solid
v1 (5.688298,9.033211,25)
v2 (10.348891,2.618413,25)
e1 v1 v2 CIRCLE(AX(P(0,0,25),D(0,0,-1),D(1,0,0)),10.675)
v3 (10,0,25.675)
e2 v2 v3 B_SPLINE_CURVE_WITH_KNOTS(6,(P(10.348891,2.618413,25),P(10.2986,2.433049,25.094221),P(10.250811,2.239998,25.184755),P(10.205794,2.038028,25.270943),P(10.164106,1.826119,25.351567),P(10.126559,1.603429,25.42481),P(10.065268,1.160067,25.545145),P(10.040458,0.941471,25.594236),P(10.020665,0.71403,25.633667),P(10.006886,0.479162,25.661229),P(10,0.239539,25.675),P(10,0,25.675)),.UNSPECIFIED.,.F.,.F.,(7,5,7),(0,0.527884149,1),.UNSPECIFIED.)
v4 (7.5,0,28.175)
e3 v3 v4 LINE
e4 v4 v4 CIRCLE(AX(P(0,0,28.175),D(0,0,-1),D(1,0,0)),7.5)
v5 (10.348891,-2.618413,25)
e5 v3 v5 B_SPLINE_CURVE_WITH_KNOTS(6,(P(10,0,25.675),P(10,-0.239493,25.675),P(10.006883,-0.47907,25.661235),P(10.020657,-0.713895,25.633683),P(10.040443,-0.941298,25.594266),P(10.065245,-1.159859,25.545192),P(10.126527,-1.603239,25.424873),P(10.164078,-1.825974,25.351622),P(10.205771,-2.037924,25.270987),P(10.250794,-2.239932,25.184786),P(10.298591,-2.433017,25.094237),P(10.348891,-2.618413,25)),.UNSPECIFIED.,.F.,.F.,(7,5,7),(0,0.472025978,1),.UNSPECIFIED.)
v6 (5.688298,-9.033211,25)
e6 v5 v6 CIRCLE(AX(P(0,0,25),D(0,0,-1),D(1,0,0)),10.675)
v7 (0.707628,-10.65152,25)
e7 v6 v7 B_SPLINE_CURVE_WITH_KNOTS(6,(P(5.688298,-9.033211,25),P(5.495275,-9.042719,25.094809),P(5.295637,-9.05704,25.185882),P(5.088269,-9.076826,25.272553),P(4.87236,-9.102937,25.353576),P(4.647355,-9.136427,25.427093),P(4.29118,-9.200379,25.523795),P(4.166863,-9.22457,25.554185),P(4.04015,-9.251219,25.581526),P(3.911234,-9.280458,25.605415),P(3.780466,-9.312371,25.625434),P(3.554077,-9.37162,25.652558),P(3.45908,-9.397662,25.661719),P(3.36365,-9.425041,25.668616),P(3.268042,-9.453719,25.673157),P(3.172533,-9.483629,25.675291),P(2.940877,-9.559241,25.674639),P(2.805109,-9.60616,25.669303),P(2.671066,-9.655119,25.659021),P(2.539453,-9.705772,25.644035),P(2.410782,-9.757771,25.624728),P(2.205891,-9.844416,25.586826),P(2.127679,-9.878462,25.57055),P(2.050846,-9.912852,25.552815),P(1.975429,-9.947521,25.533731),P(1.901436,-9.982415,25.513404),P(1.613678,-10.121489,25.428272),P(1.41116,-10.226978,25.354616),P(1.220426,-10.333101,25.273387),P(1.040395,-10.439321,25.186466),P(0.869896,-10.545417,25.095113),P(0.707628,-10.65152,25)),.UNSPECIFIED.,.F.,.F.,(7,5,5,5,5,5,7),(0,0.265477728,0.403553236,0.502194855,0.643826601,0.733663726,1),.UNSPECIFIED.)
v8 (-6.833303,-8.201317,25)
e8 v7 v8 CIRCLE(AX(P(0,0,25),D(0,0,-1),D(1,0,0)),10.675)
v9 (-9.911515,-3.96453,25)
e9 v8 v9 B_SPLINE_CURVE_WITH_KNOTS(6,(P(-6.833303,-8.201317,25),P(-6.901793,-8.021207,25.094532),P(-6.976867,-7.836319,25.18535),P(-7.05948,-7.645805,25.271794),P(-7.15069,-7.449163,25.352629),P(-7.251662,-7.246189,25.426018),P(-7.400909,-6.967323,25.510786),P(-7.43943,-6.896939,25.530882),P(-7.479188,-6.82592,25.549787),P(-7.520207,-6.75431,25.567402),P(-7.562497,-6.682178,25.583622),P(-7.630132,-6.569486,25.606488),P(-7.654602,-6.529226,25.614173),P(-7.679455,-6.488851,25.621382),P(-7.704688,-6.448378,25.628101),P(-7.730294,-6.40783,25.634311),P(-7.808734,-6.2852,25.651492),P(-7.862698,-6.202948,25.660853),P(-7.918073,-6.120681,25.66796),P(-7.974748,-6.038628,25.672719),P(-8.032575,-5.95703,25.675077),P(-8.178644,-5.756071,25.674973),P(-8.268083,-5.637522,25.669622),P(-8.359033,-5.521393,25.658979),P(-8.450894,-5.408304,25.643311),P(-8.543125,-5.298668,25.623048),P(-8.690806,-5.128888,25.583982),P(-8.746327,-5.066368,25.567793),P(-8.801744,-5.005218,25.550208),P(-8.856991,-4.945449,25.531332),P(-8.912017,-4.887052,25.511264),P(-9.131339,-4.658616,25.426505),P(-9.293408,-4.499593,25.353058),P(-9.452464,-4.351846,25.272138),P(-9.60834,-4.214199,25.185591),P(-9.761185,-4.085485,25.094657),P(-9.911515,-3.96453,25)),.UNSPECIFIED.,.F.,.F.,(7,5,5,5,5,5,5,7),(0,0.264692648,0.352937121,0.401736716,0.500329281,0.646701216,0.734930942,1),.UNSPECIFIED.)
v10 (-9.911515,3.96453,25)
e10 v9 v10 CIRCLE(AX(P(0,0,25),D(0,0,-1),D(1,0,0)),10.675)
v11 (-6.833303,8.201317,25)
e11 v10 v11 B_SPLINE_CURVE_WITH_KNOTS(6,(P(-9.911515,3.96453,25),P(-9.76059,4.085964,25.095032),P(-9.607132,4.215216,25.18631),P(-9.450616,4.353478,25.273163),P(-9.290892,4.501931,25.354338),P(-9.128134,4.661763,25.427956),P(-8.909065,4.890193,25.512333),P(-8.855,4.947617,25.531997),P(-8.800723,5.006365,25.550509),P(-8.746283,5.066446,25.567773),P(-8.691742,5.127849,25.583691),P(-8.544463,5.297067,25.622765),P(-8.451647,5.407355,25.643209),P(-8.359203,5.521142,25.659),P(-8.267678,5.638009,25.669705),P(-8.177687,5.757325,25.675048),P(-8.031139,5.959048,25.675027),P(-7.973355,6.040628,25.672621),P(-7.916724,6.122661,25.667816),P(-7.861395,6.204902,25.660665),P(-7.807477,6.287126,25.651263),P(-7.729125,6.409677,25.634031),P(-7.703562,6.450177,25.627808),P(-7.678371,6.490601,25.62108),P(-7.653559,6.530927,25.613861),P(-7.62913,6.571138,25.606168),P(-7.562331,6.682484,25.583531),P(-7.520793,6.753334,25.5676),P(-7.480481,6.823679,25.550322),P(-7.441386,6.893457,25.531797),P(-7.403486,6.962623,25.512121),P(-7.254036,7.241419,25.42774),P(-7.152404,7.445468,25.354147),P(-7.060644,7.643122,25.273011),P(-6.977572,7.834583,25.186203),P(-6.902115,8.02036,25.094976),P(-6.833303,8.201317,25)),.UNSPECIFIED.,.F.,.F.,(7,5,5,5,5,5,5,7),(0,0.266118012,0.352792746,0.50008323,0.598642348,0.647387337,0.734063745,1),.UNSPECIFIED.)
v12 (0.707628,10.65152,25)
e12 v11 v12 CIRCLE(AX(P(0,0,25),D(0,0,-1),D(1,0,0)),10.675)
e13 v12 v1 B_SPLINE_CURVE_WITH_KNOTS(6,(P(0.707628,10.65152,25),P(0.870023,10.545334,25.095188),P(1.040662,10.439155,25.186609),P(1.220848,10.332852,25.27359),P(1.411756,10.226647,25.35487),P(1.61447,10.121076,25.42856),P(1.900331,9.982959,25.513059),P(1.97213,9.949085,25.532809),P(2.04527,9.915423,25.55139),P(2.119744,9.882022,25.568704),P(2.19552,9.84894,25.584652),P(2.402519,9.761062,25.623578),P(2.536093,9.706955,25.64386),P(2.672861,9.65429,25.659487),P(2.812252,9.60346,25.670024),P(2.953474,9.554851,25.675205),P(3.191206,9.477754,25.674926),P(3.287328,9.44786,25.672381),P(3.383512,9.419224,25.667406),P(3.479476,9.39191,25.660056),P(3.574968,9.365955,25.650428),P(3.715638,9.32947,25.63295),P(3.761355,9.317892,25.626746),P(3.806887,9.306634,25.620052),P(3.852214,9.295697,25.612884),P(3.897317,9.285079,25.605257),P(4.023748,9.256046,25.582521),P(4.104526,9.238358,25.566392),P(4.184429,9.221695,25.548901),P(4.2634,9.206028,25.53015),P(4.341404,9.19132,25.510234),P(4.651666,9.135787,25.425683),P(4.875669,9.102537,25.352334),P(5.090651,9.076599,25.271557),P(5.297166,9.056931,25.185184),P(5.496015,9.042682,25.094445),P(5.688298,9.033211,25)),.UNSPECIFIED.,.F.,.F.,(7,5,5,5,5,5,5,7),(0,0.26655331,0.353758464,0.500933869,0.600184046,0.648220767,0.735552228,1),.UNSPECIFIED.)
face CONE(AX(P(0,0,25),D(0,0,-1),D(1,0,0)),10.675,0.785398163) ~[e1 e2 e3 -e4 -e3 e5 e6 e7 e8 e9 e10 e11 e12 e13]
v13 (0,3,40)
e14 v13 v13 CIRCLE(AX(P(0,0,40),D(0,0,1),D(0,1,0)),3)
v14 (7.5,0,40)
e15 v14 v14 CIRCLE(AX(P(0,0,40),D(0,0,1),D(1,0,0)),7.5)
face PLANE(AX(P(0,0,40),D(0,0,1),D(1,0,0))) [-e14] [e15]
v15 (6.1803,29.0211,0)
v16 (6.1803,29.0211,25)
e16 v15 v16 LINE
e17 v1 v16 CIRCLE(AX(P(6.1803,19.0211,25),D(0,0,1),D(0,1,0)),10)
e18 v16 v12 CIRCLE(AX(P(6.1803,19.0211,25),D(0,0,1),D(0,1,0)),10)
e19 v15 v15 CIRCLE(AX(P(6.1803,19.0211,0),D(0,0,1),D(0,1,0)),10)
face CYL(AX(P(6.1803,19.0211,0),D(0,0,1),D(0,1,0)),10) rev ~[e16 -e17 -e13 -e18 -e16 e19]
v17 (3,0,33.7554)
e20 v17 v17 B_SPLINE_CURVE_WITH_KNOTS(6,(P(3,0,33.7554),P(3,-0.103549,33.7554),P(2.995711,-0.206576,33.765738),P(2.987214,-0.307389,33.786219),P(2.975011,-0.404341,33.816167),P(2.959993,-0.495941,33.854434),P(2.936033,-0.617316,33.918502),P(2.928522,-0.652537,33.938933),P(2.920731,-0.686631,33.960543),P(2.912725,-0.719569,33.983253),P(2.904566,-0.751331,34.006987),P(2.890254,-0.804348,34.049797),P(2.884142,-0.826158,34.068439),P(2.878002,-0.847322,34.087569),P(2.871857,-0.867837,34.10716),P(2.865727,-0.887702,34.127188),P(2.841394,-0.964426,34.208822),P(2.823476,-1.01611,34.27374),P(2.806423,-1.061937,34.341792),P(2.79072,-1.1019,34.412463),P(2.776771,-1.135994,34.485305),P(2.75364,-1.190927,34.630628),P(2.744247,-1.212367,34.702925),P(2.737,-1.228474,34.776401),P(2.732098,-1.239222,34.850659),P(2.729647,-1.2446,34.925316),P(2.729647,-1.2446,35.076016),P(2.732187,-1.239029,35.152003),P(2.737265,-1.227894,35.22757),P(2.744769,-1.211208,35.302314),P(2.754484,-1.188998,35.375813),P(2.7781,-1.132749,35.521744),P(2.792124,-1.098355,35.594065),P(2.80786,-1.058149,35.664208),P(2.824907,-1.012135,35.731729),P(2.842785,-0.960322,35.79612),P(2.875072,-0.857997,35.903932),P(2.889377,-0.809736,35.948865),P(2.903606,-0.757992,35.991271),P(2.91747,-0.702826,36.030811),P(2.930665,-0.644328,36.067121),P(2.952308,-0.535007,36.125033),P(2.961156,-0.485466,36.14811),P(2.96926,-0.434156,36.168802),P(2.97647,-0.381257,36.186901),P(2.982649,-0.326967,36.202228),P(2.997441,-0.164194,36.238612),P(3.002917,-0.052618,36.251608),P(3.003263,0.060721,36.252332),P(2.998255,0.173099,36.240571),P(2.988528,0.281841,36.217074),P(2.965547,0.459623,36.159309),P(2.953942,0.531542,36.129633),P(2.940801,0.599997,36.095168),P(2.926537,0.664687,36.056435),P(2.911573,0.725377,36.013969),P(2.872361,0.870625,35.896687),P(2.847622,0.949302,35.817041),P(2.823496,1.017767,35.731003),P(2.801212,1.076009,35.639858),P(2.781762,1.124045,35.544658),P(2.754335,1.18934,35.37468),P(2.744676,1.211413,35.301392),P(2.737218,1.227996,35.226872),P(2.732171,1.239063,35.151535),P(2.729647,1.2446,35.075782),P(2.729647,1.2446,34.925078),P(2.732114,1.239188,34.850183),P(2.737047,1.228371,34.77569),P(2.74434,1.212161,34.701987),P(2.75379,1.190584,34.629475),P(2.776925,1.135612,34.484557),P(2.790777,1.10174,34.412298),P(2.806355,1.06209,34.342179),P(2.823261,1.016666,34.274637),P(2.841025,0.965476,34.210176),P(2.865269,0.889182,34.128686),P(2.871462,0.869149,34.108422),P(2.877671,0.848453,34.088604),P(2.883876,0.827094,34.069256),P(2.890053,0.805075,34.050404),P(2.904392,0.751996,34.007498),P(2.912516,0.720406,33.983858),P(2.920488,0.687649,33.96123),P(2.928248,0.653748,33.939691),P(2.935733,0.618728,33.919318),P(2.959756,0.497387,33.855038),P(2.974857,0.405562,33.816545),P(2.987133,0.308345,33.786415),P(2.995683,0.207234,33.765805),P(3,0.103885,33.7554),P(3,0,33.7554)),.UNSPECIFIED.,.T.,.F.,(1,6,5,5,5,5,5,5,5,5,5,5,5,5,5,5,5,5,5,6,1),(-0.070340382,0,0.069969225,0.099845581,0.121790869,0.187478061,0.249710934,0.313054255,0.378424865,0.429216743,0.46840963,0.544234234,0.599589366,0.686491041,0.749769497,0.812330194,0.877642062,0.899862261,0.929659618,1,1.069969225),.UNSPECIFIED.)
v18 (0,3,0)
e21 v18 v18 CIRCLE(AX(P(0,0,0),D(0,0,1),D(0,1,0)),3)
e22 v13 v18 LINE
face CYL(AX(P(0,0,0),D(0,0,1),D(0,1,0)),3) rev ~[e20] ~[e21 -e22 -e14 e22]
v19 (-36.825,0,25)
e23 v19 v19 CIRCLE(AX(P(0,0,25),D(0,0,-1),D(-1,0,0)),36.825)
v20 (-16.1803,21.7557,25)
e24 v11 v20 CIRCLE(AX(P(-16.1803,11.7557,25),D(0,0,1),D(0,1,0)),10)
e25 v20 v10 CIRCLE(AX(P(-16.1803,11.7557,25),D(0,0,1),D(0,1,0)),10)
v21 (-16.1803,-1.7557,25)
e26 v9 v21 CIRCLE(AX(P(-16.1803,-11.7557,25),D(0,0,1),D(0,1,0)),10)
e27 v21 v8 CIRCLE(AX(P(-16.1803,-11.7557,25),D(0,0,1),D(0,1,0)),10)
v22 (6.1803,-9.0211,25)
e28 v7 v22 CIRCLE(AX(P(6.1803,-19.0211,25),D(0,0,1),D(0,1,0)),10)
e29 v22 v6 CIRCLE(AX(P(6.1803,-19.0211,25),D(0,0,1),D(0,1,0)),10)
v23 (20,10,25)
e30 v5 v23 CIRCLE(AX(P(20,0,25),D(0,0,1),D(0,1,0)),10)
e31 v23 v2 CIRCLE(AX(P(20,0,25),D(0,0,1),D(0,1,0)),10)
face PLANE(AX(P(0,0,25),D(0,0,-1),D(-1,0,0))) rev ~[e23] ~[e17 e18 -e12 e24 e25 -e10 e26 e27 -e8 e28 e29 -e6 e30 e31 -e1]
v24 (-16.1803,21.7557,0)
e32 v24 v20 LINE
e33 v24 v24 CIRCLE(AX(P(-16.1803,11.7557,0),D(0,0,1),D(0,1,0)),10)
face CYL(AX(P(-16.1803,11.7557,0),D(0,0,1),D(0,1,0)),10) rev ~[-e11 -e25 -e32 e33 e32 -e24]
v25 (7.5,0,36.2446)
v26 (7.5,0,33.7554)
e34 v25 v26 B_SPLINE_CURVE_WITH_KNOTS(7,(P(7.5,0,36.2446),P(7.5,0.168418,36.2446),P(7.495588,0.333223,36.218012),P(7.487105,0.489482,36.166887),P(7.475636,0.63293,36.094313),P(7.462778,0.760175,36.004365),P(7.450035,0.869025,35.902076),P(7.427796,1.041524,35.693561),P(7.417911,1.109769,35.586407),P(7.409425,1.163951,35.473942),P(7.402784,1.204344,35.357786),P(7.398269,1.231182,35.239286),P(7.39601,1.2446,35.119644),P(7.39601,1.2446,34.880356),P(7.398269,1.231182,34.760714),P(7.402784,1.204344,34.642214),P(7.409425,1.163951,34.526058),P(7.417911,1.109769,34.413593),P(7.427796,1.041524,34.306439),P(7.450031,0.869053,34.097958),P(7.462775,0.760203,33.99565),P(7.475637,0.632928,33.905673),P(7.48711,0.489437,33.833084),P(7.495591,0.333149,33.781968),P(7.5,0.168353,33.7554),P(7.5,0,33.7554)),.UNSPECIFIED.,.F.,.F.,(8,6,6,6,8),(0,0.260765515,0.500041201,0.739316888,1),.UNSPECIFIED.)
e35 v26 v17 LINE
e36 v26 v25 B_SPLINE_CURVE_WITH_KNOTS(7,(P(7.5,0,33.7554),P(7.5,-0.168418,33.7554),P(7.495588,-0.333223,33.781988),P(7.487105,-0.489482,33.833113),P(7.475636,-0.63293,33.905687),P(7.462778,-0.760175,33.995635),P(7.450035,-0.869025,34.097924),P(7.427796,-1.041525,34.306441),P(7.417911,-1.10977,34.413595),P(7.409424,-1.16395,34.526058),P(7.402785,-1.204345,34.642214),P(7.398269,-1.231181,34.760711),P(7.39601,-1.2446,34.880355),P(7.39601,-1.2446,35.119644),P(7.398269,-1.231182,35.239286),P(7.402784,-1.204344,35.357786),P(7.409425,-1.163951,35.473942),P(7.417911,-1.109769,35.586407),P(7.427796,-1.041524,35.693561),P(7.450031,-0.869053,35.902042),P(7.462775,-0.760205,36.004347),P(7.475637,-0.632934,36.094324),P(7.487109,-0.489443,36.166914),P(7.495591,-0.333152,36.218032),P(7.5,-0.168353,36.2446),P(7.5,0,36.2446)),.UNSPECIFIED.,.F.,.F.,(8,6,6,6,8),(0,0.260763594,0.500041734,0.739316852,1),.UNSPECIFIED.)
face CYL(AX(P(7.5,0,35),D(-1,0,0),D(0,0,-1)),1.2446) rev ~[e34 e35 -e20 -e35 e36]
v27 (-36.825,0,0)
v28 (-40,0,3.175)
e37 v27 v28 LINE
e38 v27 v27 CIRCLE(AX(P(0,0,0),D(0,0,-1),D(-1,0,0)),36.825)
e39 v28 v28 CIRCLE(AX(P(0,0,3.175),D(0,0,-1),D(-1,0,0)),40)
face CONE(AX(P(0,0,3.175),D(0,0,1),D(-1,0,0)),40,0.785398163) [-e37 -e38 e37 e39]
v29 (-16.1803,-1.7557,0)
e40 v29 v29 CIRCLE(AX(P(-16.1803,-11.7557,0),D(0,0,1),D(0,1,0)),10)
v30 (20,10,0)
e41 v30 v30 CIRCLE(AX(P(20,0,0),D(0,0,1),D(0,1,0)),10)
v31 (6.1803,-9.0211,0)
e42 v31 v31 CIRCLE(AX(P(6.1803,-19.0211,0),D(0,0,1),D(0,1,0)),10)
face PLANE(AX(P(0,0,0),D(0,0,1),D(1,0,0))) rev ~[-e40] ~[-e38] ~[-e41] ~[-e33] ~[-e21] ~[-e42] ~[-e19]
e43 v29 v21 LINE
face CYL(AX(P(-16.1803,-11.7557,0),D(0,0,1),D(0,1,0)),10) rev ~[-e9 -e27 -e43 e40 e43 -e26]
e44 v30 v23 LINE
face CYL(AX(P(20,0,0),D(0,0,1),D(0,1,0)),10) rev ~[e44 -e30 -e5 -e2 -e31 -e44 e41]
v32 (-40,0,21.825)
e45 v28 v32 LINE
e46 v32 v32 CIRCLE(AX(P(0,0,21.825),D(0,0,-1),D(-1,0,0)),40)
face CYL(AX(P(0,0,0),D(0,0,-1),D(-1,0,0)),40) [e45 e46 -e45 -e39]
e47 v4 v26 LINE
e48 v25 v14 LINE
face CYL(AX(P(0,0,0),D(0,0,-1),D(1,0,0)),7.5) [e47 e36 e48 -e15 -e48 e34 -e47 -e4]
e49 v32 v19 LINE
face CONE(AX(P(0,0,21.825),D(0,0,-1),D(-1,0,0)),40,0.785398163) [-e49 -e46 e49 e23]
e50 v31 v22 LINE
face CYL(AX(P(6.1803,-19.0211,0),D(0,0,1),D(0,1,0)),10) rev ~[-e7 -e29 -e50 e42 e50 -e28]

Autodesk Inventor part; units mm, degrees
ref_plane "XZ Plane" through (0, 0, 0) normal (0, 1, 0) x (-1, 0, 0)
ref_plane "XY Plane" through (0, 0, 0) normal (0, 0, 1) x (1, 0, 0)
sketch "Boceto1" plane through (0, 0, 0) normal (0, 0, 1) x (1, 0, 0)
  circle A0 centre (0, 0) radius 3
  circle A1 centre (0, 0) radius 7.5
  circle A2 centre (0, 0) radius 127
  circle A3 centre (0, 0) radius 31.75 construction
  dimension "d0" = 6
  dimension "d1" = 15
  dimension "d2" = 254
  dimension "d3" = 63.5
extrude "Extrusión1" add sketch "Boceto1" along normal blind 40 contours A1
sketch "Boceto2" plane through (0, 0, 0) normal (0, 0, -1) x (-1, 0, 0)
  circle A0 centre (0, 0) radius 40
  dimension "d6" = 80
extrude "Extrusión2" add sketch "Boceto2" against normal blind 25
ref_plane "Plano de trabajo1" through (7.5, 0, 0) normal (1, 0, 0) x (0, 1, 0)
sketch "Boceto5" plane through (7.5, 0, 0) normal (1, 0, 0) x (0, 1, 0)
  line L0 (7.5, 40) -> (-7.5, 40) projected
  line L1 (0, 40) -> (0, 35)
  point P0 (0, 0)
  dimension "d31" = 5
sketch "Boceto6" plane through (0, 0, 0) normal (0, 0, -1) x (-1, 0, 0)
  point P0 (0, 0)
  point P1 (0, 0)
hole "Agujero2" at (0, 0, 0) direction (0, 0, 1) diameter 6 end through all
hole "Agujero3" at (7.5, 0, 35) direction (-1, 0, 0) diameter 2.4892 depth 8 tip angle 118
sketch "Boceto7" plane through (0, 0, 0) normal (0, 0, -1) x (-1, 0, 0)
  line L0 (-40, 0) -> (-30, 0)
  line L1 (10, 0) -> (-10, 0)
  line L2 (-30, 0) -> (-10, 0)
  line L3 (-10, 0) -> (-20, 0)
  circle A0 centre (-20, 0) radius 10
  point P0 (0, 0)
  point P1 (-6.1803, -19.0211)
  point P2 (16.1803, -11.7557)
  point P3 (16.1803, 11.7557)
  point P4 (-6.1803, 19.0211)
  dimension "d48" = 10
  dimension "d49" = 40
  dimension "d50" = 20
  dimension "d51" = 20
  dimension "d52" = 10
  dimension "d55" = 360
hole "Agujero4" at (-16.1803, -11.7557, 0) at (6.1803, -19.0211, 0) at (20, 0, 0) at (6.1803, 19.0211, 0) at (-16.1803, 11.7557, 0) direction (0, 0, 1) diameter 20 end through all
chamfer "Chaflán1" distance 3.175 angle 45 1 edges at (-7.5, 0, 25)
chamfer "Chaflán2" distance 3.175 angle 45 2 edges at (40, 0, 25) (40, 0, 0)
properties part number "llantasumo" material "Plástico ABS"
